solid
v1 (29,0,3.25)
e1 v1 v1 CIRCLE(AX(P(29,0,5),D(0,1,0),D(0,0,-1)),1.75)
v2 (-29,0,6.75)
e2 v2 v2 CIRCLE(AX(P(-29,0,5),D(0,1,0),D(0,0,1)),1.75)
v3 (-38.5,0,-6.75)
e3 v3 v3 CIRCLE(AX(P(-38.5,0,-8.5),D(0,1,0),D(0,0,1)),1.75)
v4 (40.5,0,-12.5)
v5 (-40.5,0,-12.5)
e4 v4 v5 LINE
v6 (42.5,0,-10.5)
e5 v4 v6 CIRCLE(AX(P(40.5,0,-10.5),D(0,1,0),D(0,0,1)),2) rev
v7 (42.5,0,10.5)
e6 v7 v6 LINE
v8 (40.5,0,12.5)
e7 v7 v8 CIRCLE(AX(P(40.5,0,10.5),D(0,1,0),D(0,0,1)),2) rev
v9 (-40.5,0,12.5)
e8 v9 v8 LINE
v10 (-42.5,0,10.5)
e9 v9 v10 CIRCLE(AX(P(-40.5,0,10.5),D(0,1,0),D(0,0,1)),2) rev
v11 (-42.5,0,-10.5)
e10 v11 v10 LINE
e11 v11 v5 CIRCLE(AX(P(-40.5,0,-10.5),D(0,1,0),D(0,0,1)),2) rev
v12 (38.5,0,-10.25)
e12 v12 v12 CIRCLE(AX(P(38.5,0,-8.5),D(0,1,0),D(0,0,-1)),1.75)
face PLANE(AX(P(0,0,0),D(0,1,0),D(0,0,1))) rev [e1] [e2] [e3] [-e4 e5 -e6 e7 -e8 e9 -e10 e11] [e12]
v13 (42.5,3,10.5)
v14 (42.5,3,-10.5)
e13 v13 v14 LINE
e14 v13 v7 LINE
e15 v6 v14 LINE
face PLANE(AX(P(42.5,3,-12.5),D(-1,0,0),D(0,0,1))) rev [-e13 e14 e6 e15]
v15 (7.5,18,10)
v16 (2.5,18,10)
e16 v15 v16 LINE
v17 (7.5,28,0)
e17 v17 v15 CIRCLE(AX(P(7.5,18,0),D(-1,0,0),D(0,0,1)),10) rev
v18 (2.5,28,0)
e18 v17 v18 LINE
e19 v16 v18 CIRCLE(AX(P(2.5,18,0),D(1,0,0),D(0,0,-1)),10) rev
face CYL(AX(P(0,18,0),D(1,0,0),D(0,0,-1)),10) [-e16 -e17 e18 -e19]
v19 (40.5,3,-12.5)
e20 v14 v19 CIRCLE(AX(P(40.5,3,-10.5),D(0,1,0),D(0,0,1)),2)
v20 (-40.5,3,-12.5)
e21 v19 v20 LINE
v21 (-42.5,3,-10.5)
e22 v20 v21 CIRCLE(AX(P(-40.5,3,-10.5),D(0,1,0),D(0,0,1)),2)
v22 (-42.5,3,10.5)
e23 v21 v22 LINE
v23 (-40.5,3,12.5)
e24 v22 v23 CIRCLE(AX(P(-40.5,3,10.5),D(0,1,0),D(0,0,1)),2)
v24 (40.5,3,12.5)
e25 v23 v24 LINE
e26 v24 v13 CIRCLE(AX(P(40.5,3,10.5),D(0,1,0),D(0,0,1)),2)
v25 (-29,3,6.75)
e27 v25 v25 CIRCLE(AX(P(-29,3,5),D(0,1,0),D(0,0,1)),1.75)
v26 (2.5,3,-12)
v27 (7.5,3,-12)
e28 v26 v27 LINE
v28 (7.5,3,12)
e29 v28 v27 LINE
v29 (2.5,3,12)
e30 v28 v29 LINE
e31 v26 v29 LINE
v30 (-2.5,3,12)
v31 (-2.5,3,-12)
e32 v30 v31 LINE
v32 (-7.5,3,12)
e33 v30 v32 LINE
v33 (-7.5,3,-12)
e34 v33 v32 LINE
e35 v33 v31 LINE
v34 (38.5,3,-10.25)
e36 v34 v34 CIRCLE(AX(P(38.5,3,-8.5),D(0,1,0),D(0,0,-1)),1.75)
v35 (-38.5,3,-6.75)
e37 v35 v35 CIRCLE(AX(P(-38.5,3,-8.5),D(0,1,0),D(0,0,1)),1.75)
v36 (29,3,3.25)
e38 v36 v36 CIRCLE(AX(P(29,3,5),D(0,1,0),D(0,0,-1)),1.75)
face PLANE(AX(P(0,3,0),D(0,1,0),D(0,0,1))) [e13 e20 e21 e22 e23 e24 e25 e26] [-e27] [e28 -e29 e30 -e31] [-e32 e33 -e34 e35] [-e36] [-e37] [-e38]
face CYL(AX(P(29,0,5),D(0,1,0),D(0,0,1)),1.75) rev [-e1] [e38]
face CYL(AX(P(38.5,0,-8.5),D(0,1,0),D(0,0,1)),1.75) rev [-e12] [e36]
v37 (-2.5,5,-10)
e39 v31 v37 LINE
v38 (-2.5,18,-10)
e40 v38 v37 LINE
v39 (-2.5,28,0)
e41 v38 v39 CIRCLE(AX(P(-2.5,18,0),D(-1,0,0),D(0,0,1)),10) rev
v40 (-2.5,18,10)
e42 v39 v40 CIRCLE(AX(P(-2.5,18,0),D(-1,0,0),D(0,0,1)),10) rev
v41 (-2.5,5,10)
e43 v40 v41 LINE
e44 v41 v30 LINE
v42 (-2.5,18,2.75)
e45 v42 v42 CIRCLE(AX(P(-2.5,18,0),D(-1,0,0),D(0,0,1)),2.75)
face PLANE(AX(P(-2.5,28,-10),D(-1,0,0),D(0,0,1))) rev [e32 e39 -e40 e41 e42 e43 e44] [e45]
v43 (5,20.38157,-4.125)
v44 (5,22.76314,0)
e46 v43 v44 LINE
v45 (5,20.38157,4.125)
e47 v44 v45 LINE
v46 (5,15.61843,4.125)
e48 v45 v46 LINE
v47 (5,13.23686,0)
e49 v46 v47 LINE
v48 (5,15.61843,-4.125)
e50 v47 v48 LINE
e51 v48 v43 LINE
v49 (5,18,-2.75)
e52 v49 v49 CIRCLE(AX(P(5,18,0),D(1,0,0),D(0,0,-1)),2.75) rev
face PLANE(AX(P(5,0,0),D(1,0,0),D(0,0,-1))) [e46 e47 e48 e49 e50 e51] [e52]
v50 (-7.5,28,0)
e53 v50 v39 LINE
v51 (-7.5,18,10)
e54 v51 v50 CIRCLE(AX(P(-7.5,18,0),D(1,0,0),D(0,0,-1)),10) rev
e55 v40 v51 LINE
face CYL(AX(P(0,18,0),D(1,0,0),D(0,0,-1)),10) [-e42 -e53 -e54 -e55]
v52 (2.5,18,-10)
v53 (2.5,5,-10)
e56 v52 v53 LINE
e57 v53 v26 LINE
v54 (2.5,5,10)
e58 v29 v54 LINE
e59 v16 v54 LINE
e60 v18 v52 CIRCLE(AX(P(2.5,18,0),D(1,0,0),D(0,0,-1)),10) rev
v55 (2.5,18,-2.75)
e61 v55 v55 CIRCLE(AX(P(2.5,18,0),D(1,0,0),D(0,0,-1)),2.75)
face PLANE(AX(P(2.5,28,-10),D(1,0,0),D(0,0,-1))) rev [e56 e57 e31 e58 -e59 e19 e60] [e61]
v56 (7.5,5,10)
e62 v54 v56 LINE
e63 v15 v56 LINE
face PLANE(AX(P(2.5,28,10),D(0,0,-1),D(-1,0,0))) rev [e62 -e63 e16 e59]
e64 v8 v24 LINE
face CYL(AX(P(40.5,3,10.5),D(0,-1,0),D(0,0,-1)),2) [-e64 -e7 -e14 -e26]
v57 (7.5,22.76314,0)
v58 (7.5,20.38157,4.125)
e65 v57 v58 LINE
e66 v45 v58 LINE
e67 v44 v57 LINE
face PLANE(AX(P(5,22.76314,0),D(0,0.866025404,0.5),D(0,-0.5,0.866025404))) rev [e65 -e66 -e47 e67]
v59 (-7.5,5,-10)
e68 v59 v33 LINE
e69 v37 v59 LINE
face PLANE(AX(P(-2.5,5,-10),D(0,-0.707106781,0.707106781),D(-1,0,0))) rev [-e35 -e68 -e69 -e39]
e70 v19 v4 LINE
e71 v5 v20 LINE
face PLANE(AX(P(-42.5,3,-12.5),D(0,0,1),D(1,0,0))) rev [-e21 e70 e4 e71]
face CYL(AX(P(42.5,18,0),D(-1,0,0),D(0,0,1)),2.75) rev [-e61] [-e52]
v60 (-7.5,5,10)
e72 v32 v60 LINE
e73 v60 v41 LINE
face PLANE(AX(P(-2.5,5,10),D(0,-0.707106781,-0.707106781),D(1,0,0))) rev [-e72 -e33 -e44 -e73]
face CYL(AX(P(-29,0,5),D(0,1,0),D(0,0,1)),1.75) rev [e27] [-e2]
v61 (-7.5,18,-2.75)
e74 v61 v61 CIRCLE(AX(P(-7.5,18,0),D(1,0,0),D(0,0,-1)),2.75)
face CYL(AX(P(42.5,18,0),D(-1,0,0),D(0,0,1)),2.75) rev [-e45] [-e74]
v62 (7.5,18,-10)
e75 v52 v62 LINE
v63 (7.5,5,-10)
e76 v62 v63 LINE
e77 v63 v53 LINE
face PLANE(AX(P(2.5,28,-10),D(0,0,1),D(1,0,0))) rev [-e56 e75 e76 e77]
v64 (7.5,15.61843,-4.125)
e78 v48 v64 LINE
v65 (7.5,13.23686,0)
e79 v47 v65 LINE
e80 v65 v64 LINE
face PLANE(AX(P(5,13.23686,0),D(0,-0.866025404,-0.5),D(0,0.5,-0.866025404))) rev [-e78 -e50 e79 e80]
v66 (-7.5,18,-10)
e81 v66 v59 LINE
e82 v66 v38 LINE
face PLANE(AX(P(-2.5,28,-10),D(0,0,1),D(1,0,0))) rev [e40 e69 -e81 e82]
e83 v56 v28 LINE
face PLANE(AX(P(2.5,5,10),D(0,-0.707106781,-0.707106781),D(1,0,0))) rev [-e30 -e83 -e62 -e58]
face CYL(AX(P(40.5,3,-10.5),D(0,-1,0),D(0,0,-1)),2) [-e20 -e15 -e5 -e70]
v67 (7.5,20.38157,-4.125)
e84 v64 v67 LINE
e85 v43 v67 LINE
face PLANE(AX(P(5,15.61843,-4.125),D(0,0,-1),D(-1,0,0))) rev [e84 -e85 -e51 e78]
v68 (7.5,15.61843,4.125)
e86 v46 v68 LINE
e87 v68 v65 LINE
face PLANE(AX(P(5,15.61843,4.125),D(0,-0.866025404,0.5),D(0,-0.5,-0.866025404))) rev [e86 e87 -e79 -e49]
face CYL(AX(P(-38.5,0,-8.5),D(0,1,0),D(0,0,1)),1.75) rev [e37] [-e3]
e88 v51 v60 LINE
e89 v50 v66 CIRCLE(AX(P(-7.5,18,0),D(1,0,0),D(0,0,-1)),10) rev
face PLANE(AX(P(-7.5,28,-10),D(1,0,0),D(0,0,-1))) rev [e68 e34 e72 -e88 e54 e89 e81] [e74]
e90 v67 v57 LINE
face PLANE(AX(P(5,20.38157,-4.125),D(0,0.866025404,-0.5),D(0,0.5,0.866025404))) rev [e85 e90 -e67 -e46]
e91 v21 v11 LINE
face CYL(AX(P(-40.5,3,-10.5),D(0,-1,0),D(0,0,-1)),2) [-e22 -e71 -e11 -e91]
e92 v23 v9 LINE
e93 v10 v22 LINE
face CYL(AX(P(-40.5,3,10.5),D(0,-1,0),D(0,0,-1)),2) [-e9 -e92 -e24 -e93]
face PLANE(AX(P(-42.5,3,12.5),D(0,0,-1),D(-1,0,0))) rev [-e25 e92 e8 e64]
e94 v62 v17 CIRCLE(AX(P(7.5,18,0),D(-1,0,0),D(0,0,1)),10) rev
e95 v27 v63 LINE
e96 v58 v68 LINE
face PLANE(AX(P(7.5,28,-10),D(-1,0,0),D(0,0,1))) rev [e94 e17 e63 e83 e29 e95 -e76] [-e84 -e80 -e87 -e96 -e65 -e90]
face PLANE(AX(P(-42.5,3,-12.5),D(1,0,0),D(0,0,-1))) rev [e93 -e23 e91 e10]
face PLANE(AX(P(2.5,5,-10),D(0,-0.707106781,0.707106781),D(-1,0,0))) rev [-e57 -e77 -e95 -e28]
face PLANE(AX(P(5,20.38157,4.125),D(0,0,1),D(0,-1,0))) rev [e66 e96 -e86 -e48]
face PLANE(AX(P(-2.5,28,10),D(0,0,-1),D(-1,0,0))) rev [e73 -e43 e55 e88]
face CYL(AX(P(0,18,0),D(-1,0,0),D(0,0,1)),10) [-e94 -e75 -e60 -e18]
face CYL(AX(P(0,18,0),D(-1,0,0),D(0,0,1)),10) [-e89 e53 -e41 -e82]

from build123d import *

# Parameters (mm, degrees)
SKETCH1_W               = 85
SKETCH1_H               = 25
BOSS_EXTRUDE1_DEPTH     = 3
SKETCH3_R               = 1.75
CUT_EXTRUDE2_DEPTH      = 45.401576549
FILLET2_R               = 2
SKETCH4_W               = 5
SKETCH4_H               = 20
BOSS_EXTRUDE2_DEPTH     = 25
FILLET3_R               = 10
CUT_EXTRUDE3_DEPTH      = 59.653644388
CUT_EXTRUDE3_DEPTH_BACK = 59.653644388
SKETCH5_R               = 2.75
CUT_EXTRUDE4_DEPTH      = 2.5
CHAMFER1_SIZE           = 2


with BuildPart() as part:
    # Sketch1 → Boss-Extrude1 (new body)
    with BuildSketch(Plane(origin=(0, 0, 0), x_dir=(1, 0, 0), z_dir=(0, 1, 0))):
        Rectangle(SKETCH1_W, SKETCH1_H)
    extrude(amount=BOSS_EXTRUDE1_DEPTH)

    # Sketch3 → Cut-Extrude2 (cut, through all)
    with BuildSketch(Plane(origin=(0, 3, 0), x_dir=(1, 0, 0), z_dir=(0, 1, 0))):
        with Locations(Location((-38.5, 8.5, 0), (0, 0, 270))):
            Circle(SKETCH3_R)
        with Locations(Location((38.5, 8.5, 0), (0, 0, 90))):
            Circle(SKETCH3_R)
        with Locations(Location((-29, -5, 0), (0, 0, 270))):
            Circle(SKETCH3_R)
        with Locations(Location((29, -5, 0), (0, 0, 90))):
            Circle(SKETCH3_R)
    extrude(amount=-CUT_EXTRUDE2_DEPTH, mode=Mode.SUBTRACT)

    # Fillet2
    fillet2_edges = [part.edges().sort_by_distance(p)[0] for p in [
        (-42.5, 1.5, -12.5),
        (42.5, 1.5, -12.5),
        (42.5, 1.5, 12.5),
        (-42.5, 1.5, 12.5),
    ]]
    fillet(fillet2_edges, radius=FILLET2_R)

    # Sketch4 → Boss-Extrude2 (add)
    with BuildSketch(Plane(origin=(0, 3, 0), x_dir=(1, 0, 0), z_dir=(0, 1, 0))):
        with Locations((-5, 0)):
            Rectangle(SKETCH4_W, SKETCH4_H)
        with Locations((5, 0)):
            Rectangle(SKETCH4_W, SKETCH4_H)
    extrude(amount=BOSS_EXTRUDE2_DEPTH)

    # Fillet3
    fillet3_edges = [part.edges().sort_by_distance(p)[0] for p in [
        (5, 28, 10),
        (5, 28, -10),
        (-5, 28, -10),
        (-5, 28, 10),
    ]]
    fillet(fillet3_edges, radius=FILLET3_R - 0.0001)  # a hair under: the kernel refuses the full size

    # Sketch5 → Cut-Extrude3 (cut, two sides: drawn at the far end of the back side and taken through both)
    with BuildSketch(Plane.ZY.offset(7.5).offset(-CUT_EXTRUDE3_DEPTH_BACK)):
        with Locations((0, 18)):
            Circle(SKETCH5_R)
    extrude(amount=CUT_EXTRUDE3_DEPTH + CUT_EXTRUDE3_DEPTH_BACK, mode=Mode.SUBTRACT)

    # Sketch6 → Cut-Extrude4 (cut)
    with BuildSketch(Plane(origin=(7.5, 0, 0), x_dir=(0, 0, -1), z_dir=(1, 0, 0))):
        Polygon((0, 13.236860279), (4.125, 15.61843014), (4.125, 20.38156986), (0, 22.763139721), (-4.125, 20.38156986), (-4.125, 15.61843014), align=None)
    extrude(amount=-CUT_EXTRUDE4_DEPTH, mode=Mode.SUBTRACT)

    # Chamfer1
    chamfer1_edges = [part.edges().sort_by_distance(p)[0] for p in [
        (-5, 3, -10),
        (-5, 3, 10),
        (5, 3, -10),
        (5, 3, 10),
    ]]
    chamfer(chamfer1_edges, length=CHAMFER1_SIZE)


solid = part.part
